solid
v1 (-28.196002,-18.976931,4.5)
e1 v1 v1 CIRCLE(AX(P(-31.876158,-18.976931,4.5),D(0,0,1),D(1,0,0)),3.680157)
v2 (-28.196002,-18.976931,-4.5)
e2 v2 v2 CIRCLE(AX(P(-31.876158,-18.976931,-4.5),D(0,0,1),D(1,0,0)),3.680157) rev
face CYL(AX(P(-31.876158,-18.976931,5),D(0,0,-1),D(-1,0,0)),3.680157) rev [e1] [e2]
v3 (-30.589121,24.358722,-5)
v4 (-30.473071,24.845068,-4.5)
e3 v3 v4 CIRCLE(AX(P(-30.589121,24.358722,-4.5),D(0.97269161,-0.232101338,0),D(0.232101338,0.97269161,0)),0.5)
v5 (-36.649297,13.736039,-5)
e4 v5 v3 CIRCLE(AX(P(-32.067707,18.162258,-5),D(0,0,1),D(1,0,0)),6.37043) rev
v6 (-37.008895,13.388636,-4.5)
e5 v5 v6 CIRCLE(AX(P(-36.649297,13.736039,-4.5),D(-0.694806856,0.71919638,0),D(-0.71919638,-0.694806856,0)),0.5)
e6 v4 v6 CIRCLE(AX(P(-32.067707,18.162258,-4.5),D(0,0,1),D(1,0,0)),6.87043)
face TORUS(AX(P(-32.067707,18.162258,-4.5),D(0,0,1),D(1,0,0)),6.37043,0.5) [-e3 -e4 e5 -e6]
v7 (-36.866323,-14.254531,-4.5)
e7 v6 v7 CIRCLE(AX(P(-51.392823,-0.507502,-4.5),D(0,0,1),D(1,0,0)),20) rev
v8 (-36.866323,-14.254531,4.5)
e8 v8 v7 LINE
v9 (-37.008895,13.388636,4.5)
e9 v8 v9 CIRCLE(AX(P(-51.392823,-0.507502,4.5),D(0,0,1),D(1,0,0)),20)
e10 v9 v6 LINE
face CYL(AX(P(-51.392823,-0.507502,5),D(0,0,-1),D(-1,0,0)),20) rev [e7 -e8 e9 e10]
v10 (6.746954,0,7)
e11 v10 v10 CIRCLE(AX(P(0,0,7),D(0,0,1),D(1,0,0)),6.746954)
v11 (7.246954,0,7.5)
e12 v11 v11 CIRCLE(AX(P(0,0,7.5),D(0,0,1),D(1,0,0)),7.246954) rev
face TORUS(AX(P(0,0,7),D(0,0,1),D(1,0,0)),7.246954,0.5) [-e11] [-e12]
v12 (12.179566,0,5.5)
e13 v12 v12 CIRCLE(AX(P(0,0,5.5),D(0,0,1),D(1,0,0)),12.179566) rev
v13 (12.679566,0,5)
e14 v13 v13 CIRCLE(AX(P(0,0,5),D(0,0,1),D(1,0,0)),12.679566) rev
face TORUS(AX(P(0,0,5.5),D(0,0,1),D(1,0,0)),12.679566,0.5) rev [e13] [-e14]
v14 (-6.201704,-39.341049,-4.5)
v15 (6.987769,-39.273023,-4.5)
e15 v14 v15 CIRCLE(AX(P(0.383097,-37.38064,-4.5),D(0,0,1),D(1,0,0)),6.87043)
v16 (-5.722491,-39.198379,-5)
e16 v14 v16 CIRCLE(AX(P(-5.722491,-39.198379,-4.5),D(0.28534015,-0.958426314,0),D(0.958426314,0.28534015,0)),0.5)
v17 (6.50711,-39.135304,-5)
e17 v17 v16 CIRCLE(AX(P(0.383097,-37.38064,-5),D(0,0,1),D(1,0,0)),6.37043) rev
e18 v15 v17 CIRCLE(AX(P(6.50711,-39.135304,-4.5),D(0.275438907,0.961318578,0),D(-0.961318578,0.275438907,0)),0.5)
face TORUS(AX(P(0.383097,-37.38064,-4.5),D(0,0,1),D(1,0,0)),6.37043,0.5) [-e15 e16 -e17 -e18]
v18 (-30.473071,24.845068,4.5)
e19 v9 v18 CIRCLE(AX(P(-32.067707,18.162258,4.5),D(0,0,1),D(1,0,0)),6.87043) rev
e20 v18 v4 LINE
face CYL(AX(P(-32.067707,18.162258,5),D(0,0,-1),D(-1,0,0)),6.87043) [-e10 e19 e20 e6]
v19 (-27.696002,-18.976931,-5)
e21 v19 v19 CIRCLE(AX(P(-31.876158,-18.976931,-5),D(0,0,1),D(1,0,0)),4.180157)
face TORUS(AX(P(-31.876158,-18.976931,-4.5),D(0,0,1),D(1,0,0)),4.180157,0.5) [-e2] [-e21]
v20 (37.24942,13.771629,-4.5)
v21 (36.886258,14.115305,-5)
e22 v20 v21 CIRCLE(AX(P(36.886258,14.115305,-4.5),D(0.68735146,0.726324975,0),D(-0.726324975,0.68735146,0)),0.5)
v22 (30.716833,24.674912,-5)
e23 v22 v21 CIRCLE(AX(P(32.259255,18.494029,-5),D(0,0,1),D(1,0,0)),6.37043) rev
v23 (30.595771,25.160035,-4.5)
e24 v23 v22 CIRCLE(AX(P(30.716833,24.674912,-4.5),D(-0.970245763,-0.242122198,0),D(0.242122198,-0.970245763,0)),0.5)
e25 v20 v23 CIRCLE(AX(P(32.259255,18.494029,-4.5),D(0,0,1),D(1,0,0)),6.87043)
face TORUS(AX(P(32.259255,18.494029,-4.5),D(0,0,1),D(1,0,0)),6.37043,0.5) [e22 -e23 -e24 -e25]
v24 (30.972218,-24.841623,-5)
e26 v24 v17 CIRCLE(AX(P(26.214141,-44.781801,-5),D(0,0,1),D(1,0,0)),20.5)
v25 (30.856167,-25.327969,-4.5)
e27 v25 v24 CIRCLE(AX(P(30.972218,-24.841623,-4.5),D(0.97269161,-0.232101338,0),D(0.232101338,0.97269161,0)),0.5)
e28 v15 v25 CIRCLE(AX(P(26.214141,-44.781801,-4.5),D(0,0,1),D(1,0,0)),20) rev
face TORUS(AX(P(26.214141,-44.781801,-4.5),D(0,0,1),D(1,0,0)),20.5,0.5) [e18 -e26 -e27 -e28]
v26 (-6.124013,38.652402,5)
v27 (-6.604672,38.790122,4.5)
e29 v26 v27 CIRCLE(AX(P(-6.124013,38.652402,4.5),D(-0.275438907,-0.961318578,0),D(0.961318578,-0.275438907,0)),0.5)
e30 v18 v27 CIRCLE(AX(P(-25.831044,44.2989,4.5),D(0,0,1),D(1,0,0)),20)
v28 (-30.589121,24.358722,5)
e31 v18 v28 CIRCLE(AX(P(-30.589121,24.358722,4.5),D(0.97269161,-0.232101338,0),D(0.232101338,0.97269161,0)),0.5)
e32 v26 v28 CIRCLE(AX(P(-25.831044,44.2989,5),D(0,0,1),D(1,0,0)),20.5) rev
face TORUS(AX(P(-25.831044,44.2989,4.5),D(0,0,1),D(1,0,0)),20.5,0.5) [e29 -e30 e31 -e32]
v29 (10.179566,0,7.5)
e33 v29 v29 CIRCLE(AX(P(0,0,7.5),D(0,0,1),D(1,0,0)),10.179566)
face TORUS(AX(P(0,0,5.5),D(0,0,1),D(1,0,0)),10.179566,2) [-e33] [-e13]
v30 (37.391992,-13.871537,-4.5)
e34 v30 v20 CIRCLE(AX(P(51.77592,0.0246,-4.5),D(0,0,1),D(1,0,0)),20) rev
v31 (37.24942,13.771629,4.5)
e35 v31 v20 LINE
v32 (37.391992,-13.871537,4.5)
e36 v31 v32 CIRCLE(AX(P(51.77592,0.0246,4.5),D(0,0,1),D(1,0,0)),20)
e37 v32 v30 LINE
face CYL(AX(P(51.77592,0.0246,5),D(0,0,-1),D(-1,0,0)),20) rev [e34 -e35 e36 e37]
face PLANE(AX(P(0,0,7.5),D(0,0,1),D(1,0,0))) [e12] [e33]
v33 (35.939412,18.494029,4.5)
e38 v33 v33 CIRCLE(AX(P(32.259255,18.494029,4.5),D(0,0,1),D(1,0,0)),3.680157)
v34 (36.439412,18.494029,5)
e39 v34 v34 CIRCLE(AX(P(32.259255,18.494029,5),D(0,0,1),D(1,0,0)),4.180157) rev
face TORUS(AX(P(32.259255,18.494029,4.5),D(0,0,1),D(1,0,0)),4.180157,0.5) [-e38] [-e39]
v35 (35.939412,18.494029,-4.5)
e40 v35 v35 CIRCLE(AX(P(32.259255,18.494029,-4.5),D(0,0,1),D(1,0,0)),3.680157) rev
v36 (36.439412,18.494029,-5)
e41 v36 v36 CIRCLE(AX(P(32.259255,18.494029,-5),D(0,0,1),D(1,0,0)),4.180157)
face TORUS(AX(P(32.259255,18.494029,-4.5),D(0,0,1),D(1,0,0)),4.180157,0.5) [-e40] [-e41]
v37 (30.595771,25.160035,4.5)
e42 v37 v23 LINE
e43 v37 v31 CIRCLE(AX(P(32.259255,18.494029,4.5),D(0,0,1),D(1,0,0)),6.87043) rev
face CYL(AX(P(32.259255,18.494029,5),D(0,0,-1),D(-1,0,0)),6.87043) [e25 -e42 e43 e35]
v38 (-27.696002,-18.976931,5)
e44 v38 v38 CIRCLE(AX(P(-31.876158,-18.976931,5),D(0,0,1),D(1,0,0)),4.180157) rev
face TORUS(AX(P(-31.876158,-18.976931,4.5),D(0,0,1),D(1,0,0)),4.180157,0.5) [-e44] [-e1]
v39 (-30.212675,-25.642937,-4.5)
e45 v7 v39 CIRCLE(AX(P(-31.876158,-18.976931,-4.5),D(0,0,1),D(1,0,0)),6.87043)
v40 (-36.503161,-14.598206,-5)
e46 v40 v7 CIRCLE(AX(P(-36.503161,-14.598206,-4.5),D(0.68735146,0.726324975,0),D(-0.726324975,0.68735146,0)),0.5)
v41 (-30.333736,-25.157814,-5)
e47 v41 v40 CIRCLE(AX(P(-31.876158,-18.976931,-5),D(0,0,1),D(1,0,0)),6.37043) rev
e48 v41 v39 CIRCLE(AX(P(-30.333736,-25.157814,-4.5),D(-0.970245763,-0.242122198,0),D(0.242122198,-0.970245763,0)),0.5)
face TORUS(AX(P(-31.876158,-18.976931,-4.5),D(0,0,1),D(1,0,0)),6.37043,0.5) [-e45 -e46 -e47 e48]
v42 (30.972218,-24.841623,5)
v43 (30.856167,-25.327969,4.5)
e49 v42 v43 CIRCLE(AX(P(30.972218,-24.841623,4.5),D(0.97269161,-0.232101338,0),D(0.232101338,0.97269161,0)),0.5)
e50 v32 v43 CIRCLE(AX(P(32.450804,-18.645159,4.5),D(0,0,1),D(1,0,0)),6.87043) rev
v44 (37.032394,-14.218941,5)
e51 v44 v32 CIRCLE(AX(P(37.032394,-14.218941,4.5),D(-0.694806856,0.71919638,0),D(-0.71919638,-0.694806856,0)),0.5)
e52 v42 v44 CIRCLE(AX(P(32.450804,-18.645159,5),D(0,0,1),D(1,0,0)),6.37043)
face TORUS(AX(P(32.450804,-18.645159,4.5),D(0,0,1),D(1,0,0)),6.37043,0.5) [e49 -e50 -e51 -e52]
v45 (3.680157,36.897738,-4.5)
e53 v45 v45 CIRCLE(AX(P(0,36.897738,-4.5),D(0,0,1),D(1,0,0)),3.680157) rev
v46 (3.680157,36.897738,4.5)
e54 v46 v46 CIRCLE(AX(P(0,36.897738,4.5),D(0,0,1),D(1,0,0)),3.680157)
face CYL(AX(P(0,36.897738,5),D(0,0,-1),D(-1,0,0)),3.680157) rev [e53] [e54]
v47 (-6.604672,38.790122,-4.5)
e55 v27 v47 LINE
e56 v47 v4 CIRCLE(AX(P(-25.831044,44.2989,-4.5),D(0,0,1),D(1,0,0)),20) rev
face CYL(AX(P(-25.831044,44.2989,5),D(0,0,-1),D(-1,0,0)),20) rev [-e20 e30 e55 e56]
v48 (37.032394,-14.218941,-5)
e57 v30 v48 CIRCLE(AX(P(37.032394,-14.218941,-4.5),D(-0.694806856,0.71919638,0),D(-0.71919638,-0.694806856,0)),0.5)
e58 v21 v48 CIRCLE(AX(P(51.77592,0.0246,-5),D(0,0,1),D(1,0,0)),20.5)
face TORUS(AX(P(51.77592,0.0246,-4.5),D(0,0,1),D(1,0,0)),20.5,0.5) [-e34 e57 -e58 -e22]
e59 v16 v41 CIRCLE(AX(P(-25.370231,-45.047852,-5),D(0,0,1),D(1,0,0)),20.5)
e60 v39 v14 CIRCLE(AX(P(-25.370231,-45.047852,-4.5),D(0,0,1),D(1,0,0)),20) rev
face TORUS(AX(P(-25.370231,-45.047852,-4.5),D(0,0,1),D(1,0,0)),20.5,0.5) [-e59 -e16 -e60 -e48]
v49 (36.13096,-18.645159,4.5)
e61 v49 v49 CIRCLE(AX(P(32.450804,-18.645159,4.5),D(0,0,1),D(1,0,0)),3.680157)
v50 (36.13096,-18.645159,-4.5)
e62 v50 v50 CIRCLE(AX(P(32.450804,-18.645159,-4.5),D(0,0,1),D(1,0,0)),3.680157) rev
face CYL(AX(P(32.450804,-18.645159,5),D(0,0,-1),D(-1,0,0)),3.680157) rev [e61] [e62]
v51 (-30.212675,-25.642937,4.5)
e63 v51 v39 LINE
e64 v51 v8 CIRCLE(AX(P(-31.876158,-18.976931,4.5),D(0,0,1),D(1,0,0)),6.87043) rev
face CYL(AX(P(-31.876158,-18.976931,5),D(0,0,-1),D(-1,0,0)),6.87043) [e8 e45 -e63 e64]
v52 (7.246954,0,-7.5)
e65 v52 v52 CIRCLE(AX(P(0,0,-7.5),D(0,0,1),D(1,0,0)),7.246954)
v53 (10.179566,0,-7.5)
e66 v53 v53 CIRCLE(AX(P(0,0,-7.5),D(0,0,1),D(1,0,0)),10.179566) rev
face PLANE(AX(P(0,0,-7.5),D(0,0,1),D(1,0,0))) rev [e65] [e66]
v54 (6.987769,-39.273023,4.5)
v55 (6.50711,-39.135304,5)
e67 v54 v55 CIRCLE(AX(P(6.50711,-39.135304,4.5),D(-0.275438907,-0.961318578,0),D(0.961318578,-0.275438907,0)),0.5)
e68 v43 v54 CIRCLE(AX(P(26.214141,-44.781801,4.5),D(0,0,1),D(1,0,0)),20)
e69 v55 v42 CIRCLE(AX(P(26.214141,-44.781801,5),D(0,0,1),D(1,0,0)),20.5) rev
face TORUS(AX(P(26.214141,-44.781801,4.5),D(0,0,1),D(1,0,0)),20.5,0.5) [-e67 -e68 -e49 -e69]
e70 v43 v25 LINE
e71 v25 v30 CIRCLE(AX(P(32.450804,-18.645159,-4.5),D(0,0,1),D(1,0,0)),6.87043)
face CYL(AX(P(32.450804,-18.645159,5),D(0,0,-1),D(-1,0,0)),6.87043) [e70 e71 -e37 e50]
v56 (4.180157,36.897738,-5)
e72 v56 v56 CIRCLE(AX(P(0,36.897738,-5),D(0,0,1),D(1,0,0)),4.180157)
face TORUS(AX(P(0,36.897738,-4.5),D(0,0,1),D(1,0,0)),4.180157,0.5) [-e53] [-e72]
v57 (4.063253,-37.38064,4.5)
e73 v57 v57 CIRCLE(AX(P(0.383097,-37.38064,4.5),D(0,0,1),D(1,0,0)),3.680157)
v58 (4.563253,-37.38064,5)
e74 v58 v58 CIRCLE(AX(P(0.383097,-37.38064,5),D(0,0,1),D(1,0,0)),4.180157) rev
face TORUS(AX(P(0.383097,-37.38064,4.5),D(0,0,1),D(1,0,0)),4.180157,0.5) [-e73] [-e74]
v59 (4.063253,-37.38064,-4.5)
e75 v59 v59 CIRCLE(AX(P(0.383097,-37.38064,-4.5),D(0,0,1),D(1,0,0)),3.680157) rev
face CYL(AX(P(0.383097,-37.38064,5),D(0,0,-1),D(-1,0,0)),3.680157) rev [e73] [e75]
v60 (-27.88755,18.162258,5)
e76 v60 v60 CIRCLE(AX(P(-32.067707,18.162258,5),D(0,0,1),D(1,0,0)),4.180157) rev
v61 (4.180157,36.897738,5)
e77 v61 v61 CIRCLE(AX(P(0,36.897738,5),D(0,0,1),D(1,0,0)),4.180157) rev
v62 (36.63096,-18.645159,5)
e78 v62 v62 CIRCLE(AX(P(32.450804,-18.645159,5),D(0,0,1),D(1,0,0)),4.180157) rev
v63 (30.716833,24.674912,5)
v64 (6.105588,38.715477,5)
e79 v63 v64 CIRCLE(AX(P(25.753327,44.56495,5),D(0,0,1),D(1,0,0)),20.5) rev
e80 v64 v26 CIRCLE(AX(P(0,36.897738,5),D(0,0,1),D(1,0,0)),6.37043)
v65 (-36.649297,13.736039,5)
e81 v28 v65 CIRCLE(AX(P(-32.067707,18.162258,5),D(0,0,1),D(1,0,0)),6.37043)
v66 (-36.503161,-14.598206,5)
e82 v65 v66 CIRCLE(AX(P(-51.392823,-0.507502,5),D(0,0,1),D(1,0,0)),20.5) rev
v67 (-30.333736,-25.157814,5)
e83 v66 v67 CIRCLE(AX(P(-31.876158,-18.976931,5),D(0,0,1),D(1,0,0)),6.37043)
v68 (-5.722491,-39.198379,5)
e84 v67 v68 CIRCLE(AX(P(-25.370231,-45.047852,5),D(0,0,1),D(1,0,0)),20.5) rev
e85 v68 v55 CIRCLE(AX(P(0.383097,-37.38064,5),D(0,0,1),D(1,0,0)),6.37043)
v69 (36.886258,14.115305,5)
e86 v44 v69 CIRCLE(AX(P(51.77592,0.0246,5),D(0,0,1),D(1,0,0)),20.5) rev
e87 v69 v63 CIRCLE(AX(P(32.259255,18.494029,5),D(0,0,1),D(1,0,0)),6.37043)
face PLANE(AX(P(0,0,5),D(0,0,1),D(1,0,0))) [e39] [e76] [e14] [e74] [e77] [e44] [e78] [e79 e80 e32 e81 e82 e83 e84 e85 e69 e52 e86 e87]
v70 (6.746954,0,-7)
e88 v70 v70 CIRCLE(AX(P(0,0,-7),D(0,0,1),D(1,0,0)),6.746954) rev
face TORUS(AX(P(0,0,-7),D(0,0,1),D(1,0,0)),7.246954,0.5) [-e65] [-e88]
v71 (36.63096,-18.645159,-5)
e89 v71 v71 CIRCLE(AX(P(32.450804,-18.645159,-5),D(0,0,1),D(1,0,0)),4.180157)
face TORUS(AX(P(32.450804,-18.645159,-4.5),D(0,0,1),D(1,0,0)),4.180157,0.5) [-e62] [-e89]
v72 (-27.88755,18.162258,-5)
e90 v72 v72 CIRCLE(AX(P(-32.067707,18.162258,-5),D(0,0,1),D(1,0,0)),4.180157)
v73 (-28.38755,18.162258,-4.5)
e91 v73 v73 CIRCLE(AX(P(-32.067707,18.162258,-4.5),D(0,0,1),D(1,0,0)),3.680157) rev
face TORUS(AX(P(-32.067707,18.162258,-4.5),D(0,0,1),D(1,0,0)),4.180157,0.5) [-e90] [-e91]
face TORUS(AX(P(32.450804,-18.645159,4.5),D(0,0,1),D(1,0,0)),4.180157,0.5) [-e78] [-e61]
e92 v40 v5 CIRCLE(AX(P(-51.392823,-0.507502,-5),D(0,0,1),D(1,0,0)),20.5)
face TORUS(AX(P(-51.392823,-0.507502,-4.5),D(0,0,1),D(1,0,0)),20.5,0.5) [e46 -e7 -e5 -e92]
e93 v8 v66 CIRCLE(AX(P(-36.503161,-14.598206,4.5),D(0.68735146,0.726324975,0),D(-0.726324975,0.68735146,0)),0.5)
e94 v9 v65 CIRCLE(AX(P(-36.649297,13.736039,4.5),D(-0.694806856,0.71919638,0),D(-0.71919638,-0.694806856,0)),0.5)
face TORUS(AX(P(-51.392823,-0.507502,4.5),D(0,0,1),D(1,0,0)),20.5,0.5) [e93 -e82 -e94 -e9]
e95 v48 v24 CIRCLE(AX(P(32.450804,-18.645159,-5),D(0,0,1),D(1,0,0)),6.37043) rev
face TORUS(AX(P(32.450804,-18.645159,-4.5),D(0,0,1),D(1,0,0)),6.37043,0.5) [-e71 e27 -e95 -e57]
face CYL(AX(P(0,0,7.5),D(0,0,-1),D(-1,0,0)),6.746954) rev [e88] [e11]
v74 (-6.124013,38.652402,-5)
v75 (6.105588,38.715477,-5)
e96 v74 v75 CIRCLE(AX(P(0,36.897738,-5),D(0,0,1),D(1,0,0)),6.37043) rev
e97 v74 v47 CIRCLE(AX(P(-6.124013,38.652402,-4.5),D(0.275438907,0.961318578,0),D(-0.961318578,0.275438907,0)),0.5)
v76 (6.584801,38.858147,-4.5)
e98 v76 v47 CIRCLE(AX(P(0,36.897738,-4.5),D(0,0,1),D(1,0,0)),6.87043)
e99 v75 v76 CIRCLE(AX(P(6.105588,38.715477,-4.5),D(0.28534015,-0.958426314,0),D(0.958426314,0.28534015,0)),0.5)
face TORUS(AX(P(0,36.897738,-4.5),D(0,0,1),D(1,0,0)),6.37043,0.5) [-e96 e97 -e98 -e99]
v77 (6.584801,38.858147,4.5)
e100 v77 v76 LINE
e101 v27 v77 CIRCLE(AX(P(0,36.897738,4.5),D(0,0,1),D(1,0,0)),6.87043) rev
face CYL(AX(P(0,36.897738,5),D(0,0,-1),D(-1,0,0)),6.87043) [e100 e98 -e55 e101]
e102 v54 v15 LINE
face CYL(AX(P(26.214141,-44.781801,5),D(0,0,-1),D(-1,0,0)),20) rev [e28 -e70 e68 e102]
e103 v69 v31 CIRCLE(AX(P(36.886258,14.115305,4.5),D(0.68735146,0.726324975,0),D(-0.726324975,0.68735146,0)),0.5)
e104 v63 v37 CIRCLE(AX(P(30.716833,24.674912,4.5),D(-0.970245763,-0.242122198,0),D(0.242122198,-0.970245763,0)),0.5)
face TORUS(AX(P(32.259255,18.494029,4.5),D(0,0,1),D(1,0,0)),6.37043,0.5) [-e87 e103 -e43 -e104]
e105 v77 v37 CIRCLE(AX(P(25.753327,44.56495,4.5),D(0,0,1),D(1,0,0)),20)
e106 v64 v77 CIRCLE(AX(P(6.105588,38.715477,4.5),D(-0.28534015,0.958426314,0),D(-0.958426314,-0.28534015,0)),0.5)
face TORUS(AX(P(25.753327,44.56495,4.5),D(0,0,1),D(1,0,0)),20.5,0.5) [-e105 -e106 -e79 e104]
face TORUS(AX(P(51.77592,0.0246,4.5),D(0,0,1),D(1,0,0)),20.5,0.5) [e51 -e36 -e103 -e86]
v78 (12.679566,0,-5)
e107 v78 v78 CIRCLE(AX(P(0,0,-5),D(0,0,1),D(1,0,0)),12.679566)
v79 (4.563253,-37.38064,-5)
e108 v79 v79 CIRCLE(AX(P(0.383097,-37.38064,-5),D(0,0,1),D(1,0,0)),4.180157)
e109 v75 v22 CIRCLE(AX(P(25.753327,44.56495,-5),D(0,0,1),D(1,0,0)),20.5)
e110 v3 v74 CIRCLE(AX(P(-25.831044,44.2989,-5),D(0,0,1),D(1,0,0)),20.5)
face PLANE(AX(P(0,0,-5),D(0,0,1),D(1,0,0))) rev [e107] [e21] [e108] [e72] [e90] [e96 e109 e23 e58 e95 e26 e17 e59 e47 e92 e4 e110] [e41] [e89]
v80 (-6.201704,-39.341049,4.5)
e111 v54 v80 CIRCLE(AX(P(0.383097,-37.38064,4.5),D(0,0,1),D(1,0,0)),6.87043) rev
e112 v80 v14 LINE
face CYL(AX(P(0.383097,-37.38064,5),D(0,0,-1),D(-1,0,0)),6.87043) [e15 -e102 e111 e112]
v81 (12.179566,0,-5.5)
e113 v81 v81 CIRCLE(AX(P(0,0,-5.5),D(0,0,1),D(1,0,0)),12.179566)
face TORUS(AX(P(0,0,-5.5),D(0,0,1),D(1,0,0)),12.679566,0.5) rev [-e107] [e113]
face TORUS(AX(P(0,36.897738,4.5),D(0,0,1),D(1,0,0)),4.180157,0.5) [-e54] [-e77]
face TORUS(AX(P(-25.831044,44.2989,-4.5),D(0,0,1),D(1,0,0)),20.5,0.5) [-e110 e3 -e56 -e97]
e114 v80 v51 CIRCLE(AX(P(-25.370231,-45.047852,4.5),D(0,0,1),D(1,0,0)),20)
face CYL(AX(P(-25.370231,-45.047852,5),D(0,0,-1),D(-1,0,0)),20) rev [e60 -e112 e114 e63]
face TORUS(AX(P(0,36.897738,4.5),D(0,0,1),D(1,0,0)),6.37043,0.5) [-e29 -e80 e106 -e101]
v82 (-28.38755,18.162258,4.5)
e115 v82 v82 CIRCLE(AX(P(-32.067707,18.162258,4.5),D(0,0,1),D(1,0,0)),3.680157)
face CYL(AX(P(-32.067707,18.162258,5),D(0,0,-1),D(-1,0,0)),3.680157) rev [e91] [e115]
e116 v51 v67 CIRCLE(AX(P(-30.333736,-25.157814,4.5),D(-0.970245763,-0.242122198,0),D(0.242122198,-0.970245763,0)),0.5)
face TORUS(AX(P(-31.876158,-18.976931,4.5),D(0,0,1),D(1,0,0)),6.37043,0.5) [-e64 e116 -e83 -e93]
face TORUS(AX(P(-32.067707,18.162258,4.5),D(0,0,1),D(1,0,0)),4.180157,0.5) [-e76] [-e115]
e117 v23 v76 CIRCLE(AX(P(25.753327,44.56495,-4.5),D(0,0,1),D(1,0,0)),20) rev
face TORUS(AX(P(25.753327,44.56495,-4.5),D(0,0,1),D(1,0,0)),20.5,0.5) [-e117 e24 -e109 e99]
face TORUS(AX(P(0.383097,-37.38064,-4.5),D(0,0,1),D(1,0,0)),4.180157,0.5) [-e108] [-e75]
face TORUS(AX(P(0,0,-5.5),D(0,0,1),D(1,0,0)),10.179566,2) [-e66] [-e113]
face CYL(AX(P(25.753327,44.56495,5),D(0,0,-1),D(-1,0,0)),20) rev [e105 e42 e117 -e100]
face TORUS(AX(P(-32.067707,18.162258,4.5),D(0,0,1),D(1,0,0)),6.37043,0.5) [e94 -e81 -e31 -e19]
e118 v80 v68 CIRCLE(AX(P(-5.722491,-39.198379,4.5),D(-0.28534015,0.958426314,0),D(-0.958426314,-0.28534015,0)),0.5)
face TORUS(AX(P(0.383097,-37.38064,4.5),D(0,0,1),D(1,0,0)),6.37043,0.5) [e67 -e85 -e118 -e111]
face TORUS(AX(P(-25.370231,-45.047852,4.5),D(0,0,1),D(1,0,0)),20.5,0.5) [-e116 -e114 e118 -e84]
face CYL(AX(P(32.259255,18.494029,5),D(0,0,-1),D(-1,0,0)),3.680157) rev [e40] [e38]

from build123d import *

# Parameters (mm, degrees)
SKETCH1_R           = 12.179565837
SKETCH1_R_2         = 6.746953737
BOSS_EXTRUDE1_DEPTH = 7.5
SKETCH1_3_R         = 3.680156584
SKETCH1_3_R_2       = 12.179565837
BOSS_EXTRUDE2_DEPTH = 5
FILLET1_R           = 2
FILLET2_R           = 2
FILLET3_R           = 0.5


with BuildPart() as part:
    # Sketch1 → Boss-Extrude1 (new, symmetric)
    with BuildSketch(Plane.XY):
        Circle(SKETCH1_R)
        Circle(SKETCH1_R_2, mode=Mode.SUBTRACT)
    extrude(amount=BOSS_EXTRUDE1_DEPTH, both=True)

    # Sketch1<3> → Boss-Extrude2 (add, symmetric)
    with BuildSketch(Plane.XY):
        with BuildLine():
            ThreePointArc((-30.473070588, 24.845067554), (-15.74184606, 27.030197188), (-6.604672262, 38.790121618))
            ThreePointArc((-6.604672262, 38.790121618), (-0.03543434, 43.768076709), (6.584801162, 38.858147417))
            ThreePointArc((6.584801162, 38.858147417), (15.8427912, 27.193097564), (30.595771402, 25.160035151))
            ThreePointArc((30.595771402, 25.160035151), (38.191425931, 21.959885773), (37.249420184, 13.771629003))
            ThreePointArc((37.249420184, 13.771629003), (31.776185694, -0.078550485), (37.391992098, -13.871537328))
            ThreePointArc((37.391992098, -13.871537328), (38.418408705, -22.049641797), (30.856167456, -25.327969275))
            ThreePointArc((30.856167456, -25.327969275), (16.124942928, -27.513098909), (6.98776913, -39.273023339))
            ThreePointArc((6.98776913, -39.273023339), (0.418531208, -44.250978431), (-6.201704295, -39.341049138))
            ThreePointArc((-6.201704295, -39.341049138), (-15.459694333, -27.675999285), (-30.212674534, -25.642936872))
            ThreePointArc((-30.212674534, -25.642936872), (-37.808329063, -22.442787494), (-36.866323316, -14.254530724))
            ThreePointArc((-36.866323316, -14.254530724), (-31.393088826, -0.404351236), (-37.00889523, 13.388635606))
            ThreePointArc((-37.00889523, 13.388635606), (-38.035311838, 21.566740076), (-30.473070588, 24.845067554))
        make_face()
        with Locations((-32.067706649, 18.162257666)):
            Circle(SKETCH1_3_R, mode=Mode.SUBTRACT)
        with Locations((-31.876158216, -18.976931006)):
            Circle(SKETCH1_3_R, mode=Mode.SUBTRACT)
        with Locations((0.383096867, -37.380639533)):
            Circle(SKETCH1_3_R, mode=Mode.SUBTRACT)
        with Locations((32.450803517, -18.645159387)):
            Circle(SKETCH1_3_R, mode=Mode.SUBTRACT)
        with Locations((32.259255083, 18.494029285)):
            Circle(SKETCH1_3_R, mode=Mode.SUBTRACT)
        with Locations((0, 36.897737812)):
            Circle(SKETCH1_3_R, mode=Mode.SUBTRACT)
        Circle(SKETCH1_3_R_2, mode=Mode.SUBTRACT)
    extrude(amount=BOSS_EXTRUDE2_DEPTH, both=True)

    # Fillet1
    fillet1_edges = [part.edges().sort_by_distance(p)[0] for p in [
        (-12.179565837, 0, -7.5),
    ]]
    fillet(fillet1_edges, radius=FILLET1_R)

    # Fillet2
    fillet2_edges = [part.edges().sort_by_distance(p)[0] for p in [
        (-12.179565837, 0, 7.5),
    ]]
    fillet(fillet2_edges, radius=FILLET2_R)

    # Fillet3
    fillet3_edges = [part.edges().sort_by_distance(p)[0] for p in [
        (-38.035311838, 21.566740076, -5),
        (-31.393088826, -0.404351236, 5),
        (-37.808329063, -22.442787494, -5),
        (-15.459694333, -27.675999285, 5),
        (0.418531208, -44.250978431, -5),
        (16.124942928, -27.513098909, 5),
        (38.418408705, -22.049641797, -5),
        (31.776185694, -0.078550485, 5),
        (38.191425931, 21.959885773, -5),
        (15.8427912, 27.193097564, 5),
        (-3.680156584, 36.897737812, 5),
        (28.579098499, 18.494029285, 5),
        (28.770646933, -18.645159387, 5),
        (-3.297059716, -37.380639533, 5),
        (-35.556314799, -18.976931006, 5),
        (-35.747863233, 18.162257666, 5),
        (-0.03543434, 43.768076709, -5),
        (-12.179565837, 0, 5),
        (-38.035311838, 21.566740076, 5),
        (-37.808329063, -22.442787494, 5),
        (0.418531208, -44.250978431, 5),
        (38.418408705, -22.049641797, 5),
        (38.191425931, 21.959885773, 5),
        (-0.03543434, 43.768076709, 5),
        (-15.74184606, 27.030197188, -5),
        (15.8427912, 27.193097564, -5),
        (31.776185694, -0.078550485, -5),
        (16.124942928, -27.513098909, -5),
        (-15.459694333, -27.675999285, -5),
        (-31.393088826, -0.404351236, -5),
        (-35.747863233, 18.162257666, -5),
        (-35.556314799, -18.976931006, -5),
        (-3.297059716, -37.380639533, -5),
        (28.770646933, -18.645159387, -5),
        (28.579098499, 18.494029285, -5),
        (-3.680156584, 36.897737812, -5),
        (-6.746953737, 0, -7.5),
        (-6.746953737, 0, 7.5),
        (-12.179565837, 0, -5),
        (-15.74184606, 27.030197188, 5),
    ]]
    fillet(fillet3_edges, radius=FILLET3_R - 0.0001)  # a hair under: the kernel refuses the full size


solid = part.part
